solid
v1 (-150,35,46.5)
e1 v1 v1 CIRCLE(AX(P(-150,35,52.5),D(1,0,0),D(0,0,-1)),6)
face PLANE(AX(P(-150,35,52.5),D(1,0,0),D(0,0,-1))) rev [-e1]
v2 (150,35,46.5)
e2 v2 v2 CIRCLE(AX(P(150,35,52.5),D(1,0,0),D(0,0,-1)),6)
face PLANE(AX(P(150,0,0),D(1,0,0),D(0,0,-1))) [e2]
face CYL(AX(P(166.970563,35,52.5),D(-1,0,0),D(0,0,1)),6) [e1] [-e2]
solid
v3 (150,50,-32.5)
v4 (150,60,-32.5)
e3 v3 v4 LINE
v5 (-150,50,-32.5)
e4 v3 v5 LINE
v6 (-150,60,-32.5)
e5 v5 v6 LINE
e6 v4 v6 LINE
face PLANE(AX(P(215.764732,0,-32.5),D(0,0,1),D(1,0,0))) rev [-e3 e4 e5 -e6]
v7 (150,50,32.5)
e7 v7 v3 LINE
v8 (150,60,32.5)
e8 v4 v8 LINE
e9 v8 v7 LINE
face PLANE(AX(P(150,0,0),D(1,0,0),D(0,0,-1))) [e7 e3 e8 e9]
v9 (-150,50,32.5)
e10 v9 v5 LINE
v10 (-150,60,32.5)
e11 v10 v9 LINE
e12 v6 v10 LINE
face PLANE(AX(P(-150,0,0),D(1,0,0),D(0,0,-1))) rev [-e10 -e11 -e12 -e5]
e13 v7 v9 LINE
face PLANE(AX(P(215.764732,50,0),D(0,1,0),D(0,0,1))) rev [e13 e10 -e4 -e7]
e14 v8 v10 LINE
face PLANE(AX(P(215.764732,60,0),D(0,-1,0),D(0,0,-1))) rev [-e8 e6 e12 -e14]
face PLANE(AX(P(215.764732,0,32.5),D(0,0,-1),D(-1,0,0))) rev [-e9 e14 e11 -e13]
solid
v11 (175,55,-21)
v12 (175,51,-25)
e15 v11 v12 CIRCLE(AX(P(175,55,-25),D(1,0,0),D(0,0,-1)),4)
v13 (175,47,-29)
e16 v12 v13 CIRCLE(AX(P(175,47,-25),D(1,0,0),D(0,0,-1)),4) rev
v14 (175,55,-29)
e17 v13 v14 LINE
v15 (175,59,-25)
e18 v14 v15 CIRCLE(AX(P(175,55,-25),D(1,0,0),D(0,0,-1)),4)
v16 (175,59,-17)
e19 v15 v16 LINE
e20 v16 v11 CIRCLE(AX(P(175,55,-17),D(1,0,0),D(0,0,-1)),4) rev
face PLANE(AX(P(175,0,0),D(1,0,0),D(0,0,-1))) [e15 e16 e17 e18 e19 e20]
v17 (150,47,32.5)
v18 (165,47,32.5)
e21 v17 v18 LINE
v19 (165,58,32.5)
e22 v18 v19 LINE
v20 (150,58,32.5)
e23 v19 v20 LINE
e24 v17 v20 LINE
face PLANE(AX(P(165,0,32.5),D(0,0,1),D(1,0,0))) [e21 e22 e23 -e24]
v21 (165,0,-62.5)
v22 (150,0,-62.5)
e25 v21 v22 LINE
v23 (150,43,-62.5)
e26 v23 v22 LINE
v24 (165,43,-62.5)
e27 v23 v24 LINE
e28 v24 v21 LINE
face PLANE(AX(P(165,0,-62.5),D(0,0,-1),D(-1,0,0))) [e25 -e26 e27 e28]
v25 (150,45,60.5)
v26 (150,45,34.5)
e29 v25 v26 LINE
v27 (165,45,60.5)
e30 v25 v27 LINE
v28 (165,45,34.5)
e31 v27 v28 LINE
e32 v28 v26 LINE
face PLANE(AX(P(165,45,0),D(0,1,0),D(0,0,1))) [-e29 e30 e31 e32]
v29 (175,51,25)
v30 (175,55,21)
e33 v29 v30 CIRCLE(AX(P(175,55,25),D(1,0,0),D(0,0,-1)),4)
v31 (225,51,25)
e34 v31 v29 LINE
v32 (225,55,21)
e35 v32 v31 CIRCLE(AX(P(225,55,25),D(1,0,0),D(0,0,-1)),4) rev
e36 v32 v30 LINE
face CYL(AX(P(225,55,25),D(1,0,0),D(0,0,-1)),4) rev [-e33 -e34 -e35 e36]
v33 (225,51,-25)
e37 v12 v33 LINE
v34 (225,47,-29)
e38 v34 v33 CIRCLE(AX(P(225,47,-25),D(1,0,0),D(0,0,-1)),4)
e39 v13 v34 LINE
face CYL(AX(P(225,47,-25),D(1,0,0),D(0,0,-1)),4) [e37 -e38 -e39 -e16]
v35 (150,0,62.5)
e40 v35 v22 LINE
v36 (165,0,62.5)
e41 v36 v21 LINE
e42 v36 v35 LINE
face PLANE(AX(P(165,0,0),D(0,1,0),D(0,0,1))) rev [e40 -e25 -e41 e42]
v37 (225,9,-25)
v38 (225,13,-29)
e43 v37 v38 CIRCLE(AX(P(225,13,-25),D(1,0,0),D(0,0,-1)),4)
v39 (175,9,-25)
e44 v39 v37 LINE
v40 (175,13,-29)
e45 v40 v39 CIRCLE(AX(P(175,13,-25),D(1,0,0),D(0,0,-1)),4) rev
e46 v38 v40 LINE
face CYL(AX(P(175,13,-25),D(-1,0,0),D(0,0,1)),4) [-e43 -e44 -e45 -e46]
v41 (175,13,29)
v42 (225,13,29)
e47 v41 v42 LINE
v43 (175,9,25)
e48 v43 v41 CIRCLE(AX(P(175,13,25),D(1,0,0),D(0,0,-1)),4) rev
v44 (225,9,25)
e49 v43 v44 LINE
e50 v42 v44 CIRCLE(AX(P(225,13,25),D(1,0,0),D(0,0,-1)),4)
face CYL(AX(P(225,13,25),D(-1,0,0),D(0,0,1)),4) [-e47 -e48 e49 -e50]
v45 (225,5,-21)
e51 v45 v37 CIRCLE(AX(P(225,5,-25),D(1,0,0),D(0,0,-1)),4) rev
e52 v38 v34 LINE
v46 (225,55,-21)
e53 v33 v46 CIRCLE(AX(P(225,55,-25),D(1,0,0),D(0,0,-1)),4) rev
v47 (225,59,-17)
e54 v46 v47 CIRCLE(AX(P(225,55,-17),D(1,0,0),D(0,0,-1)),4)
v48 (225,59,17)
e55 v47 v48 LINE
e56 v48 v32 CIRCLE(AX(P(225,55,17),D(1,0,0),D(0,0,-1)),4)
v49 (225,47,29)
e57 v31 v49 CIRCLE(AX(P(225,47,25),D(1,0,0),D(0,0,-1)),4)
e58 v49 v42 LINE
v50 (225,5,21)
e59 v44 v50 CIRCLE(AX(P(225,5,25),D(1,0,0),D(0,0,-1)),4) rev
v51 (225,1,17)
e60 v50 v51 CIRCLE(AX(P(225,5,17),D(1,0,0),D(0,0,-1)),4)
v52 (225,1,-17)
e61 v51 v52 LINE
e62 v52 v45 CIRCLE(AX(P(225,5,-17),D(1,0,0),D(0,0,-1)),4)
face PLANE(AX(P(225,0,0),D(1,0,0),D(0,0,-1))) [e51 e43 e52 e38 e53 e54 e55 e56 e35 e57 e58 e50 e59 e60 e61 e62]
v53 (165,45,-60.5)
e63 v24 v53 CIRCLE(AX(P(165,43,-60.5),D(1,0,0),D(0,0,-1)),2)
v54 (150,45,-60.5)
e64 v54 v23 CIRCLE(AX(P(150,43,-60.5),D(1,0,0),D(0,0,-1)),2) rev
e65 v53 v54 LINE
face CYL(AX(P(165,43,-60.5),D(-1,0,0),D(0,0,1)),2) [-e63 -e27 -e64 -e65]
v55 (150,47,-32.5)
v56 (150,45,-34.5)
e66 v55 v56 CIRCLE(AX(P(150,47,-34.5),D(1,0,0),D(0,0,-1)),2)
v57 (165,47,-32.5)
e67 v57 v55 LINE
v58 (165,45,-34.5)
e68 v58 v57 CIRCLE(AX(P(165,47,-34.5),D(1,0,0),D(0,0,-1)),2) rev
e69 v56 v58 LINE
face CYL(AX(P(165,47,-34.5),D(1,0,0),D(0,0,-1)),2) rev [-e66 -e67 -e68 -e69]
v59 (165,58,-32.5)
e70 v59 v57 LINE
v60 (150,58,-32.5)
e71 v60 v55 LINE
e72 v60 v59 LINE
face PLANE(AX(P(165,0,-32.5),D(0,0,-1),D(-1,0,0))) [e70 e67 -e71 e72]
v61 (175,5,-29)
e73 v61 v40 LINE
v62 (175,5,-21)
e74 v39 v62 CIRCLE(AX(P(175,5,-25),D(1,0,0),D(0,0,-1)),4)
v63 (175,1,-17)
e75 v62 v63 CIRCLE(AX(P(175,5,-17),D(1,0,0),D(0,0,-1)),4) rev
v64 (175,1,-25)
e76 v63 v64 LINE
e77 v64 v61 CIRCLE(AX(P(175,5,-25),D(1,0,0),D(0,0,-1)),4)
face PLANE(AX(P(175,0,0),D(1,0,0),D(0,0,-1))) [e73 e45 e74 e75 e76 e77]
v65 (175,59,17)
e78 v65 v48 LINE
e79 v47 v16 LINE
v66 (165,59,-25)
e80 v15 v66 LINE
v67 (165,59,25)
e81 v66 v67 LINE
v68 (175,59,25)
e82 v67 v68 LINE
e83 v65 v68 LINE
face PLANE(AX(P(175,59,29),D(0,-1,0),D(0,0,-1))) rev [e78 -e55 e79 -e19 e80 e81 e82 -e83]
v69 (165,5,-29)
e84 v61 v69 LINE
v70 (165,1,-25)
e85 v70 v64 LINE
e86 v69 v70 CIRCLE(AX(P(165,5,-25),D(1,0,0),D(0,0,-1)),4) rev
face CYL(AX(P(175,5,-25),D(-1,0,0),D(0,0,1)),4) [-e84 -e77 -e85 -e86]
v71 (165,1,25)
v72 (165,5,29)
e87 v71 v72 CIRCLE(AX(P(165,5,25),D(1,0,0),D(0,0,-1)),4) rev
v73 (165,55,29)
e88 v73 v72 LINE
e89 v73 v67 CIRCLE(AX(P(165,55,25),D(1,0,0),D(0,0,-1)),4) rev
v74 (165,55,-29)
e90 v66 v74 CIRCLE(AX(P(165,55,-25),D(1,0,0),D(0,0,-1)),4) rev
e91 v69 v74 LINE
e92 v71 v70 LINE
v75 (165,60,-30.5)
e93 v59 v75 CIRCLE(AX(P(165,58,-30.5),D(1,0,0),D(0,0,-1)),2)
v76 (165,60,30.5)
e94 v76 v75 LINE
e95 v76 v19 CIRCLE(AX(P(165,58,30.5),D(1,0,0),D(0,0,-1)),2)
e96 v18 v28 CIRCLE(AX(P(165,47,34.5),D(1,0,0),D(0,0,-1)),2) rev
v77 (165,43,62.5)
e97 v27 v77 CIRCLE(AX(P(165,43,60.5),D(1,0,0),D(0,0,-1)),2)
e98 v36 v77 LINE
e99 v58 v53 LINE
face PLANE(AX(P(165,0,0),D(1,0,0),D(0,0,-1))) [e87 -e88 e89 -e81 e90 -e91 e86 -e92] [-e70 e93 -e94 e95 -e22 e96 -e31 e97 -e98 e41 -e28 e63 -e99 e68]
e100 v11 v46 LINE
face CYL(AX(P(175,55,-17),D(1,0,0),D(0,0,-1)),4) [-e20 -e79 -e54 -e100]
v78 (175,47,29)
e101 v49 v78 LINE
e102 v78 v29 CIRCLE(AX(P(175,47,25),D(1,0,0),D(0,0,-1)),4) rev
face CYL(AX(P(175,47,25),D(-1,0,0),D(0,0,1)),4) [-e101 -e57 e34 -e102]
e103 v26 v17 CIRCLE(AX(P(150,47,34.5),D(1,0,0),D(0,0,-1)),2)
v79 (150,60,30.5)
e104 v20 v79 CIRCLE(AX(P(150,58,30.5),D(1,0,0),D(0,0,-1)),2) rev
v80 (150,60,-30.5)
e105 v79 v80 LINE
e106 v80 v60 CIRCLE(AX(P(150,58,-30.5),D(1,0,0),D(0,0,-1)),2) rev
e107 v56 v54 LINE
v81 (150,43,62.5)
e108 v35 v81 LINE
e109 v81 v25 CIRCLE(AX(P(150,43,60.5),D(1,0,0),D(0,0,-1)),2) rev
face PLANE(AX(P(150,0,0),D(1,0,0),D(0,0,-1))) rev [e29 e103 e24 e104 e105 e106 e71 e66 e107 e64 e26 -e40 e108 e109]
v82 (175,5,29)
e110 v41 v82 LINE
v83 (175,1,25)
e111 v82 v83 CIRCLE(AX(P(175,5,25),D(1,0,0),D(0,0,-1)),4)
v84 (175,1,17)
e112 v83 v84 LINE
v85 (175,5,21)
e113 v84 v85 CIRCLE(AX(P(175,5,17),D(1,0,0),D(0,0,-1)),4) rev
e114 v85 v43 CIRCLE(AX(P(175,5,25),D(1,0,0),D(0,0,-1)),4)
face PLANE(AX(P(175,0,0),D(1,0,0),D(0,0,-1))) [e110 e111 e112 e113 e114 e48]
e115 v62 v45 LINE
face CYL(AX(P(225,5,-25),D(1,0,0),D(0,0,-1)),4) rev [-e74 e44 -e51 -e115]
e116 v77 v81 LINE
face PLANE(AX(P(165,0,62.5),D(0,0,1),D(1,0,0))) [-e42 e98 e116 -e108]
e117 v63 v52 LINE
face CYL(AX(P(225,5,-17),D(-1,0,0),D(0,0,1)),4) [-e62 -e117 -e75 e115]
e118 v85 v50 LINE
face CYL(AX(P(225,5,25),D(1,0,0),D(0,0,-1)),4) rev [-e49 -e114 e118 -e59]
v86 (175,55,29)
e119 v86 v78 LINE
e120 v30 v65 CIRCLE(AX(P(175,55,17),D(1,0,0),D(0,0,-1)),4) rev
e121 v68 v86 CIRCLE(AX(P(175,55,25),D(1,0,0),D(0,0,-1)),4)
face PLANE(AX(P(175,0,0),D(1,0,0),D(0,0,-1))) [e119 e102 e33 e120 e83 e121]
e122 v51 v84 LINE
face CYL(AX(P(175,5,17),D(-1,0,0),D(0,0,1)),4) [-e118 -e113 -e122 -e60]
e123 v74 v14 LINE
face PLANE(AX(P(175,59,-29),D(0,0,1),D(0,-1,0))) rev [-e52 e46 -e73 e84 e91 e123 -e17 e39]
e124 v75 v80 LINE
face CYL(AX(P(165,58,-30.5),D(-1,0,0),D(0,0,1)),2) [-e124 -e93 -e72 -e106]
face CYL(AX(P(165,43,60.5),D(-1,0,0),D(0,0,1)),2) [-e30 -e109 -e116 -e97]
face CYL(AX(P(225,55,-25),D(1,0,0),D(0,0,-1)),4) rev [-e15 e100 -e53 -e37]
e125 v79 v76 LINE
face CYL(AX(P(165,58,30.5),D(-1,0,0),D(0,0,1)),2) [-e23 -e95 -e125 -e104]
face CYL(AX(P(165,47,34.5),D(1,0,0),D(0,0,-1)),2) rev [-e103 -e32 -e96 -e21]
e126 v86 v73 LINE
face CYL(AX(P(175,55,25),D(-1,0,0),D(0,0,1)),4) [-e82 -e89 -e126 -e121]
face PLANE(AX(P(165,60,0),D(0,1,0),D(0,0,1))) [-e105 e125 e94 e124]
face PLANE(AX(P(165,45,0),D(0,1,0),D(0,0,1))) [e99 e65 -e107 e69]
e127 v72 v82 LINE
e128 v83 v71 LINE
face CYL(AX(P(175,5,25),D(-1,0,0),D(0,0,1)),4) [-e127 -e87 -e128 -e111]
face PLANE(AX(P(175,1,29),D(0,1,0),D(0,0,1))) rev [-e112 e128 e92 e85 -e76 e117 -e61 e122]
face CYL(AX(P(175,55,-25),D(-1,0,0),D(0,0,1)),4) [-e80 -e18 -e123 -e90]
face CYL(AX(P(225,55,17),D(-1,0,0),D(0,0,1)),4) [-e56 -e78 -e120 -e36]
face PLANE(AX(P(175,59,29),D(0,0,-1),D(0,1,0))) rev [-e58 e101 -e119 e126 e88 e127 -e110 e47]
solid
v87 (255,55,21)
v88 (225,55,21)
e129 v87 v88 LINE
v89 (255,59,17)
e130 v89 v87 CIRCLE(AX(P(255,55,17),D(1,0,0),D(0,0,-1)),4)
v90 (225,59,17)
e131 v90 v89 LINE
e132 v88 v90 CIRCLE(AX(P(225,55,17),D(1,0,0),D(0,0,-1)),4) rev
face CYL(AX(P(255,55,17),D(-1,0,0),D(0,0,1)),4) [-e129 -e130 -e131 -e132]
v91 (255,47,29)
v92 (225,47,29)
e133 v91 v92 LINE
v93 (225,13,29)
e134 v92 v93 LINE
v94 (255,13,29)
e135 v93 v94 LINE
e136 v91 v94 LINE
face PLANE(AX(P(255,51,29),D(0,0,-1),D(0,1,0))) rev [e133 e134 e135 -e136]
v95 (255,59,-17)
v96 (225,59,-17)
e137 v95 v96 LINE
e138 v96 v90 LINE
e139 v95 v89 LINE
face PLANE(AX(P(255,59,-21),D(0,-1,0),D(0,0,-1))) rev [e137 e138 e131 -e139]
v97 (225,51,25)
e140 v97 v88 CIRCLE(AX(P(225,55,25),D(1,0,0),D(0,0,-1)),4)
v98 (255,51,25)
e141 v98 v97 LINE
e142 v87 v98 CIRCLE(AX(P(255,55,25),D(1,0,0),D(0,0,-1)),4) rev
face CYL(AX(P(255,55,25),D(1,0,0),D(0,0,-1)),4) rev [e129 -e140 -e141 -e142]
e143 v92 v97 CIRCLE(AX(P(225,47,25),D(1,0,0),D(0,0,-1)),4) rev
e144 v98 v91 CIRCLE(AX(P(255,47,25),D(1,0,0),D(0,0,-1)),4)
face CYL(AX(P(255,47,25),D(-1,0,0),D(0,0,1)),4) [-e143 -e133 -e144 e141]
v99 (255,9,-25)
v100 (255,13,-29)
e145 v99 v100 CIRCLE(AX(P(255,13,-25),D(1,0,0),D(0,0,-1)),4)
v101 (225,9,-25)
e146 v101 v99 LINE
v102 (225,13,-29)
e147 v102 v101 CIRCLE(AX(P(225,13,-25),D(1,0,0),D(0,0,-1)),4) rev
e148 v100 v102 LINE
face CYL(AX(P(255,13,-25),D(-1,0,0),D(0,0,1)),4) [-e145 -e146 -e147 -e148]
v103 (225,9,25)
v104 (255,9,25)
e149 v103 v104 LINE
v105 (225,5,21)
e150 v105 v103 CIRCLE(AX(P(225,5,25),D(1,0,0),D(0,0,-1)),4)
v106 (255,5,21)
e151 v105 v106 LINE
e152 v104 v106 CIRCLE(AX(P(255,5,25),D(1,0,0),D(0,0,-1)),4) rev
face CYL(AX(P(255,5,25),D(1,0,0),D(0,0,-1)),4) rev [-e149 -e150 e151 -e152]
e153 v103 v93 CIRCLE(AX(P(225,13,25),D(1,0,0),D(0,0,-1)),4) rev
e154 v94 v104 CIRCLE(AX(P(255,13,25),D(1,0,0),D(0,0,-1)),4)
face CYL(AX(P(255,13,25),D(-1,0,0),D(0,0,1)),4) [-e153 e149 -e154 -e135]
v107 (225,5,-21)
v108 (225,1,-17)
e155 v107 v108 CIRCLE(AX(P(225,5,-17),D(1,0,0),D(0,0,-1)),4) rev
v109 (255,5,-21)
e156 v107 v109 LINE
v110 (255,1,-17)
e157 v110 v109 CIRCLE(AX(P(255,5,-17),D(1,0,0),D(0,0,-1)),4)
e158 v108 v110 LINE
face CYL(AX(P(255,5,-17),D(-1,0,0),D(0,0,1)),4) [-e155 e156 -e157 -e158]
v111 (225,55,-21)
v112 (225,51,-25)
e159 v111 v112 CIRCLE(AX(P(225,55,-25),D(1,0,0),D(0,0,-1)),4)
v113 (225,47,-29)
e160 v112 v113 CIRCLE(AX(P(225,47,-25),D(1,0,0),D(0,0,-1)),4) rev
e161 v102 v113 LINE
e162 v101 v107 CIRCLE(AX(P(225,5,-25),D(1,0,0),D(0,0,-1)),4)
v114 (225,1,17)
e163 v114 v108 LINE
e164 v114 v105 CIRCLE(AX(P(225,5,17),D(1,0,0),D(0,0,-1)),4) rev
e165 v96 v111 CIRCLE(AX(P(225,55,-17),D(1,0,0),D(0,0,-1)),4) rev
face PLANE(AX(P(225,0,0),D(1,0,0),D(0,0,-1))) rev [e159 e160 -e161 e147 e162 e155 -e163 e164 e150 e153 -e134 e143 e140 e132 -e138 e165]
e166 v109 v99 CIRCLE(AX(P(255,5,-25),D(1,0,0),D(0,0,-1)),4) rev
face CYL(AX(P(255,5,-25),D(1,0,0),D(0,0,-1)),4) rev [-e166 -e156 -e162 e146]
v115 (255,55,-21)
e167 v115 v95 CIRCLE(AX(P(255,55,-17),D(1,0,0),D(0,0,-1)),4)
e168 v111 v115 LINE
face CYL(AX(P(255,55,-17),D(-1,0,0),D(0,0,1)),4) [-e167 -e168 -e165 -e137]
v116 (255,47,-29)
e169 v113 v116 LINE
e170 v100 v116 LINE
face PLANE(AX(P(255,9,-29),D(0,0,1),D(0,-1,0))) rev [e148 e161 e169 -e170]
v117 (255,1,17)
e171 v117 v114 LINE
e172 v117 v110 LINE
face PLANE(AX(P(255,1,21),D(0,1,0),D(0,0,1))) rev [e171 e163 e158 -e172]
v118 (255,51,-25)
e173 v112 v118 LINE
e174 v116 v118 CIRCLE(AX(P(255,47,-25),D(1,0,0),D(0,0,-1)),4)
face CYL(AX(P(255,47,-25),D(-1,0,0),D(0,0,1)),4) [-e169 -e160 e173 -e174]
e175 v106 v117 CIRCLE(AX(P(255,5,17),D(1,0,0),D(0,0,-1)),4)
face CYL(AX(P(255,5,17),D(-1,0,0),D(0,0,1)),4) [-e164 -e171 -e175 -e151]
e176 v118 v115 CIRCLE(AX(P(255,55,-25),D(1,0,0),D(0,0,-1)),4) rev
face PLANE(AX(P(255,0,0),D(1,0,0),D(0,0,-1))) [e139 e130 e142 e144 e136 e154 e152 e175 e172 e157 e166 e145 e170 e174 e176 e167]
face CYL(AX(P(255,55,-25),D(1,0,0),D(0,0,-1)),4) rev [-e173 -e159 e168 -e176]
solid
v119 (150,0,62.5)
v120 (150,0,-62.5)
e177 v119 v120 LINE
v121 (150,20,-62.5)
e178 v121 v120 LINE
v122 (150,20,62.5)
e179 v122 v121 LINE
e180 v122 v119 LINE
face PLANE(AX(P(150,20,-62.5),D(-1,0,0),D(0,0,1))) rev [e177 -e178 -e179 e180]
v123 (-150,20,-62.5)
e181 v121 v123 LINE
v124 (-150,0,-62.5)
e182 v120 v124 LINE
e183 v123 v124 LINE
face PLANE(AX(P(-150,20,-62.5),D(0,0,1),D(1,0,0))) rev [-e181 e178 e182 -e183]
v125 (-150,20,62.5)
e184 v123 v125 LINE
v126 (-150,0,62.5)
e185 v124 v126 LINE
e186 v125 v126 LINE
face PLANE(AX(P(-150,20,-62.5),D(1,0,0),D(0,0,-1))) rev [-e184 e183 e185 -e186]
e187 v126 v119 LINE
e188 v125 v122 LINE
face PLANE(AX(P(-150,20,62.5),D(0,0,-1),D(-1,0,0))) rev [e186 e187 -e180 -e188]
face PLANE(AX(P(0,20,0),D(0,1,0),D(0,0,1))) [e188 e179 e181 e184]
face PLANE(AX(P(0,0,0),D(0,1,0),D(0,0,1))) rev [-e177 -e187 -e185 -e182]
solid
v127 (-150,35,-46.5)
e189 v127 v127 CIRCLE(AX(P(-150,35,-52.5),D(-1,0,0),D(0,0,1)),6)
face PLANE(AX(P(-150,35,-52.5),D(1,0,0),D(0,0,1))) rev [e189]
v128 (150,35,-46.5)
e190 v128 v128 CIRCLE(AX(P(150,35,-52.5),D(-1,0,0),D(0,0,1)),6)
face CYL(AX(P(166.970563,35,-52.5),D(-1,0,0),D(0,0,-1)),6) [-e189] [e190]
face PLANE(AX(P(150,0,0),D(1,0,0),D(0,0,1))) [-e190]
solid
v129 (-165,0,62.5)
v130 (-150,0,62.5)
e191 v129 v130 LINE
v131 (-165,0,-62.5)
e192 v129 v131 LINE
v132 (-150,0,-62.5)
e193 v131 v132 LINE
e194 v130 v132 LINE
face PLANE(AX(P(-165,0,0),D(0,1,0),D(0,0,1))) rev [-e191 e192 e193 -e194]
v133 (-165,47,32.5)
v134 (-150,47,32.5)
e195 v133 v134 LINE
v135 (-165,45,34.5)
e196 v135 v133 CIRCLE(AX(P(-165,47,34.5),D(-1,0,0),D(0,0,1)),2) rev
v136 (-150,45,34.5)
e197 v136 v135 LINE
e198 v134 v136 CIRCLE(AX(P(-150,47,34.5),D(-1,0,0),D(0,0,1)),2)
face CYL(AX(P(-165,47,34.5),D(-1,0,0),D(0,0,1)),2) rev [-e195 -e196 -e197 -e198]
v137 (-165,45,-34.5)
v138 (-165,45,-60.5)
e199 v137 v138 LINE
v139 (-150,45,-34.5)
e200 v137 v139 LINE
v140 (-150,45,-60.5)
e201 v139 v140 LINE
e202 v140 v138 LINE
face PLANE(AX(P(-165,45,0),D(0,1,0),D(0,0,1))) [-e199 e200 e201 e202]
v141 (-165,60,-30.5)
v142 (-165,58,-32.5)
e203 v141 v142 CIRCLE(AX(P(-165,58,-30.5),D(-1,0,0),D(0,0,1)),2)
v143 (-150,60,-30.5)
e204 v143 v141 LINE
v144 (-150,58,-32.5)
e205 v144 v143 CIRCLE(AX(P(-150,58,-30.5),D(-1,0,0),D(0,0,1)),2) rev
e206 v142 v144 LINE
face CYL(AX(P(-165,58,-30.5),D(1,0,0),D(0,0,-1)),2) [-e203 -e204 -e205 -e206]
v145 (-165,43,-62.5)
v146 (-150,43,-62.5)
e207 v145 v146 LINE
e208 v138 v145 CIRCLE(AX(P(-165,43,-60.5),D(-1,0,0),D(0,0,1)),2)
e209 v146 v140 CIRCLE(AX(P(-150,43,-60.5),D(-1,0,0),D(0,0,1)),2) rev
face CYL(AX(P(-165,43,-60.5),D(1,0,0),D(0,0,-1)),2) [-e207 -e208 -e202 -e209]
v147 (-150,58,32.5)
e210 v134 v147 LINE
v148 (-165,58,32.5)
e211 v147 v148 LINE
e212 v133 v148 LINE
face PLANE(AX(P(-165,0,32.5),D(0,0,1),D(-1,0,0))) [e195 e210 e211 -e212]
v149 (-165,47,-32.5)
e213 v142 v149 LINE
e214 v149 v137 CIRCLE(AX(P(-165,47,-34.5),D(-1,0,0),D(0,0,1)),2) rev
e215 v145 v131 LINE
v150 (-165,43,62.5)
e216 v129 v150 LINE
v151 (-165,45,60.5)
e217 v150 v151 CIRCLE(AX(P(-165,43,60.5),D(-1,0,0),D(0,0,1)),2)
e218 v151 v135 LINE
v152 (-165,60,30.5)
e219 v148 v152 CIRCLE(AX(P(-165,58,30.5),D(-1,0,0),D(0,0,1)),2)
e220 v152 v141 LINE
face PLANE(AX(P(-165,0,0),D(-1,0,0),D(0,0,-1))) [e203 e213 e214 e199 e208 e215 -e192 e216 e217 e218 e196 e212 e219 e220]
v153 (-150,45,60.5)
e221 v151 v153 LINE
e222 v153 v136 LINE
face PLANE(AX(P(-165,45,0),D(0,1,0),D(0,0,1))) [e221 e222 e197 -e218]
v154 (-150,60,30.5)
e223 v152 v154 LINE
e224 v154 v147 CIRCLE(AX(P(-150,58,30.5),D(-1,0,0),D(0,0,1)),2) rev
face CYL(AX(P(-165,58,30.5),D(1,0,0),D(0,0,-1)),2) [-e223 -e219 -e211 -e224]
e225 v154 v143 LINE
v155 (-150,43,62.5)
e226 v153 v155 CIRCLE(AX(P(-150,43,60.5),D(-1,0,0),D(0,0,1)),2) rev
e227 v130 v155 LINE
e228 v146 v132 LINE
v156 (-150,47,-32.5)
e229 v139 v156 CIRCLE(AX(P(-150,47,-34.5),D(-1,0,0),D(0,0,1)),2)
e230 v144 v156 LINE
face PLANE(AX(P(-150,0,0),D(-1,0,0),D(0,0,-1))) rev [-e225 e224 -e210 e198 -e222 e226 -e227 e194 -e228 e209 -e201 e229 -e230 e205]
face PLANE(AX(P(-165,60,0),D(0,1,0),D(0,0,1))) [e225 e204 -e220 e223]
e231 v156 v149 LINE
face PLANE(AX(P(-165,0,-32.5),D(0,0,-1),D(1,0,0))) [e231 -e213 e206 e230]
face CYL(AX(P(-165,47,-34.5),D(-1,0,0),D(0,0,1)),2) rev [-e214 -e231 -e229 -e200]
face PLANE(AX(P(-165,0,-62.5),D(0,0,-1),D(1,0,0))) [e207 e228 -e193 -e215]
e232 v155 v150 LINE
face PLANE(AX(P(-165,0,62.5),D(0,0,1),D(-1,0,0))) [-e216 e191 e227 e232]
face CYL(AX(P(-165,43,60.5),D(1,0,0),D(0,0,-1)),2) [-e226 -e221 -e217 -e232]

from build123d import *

# Parameters (mm, degrees)
SKETCH1_W           = 300
SKETCH1_H           = 125
BOSS_EXTRUDE1_DEPTH = 20
SKETCH2_W           = 125
SKETCH2_H           = 20
BOSS_EXTRUDE2_DEPTH = 15
SKETCH3_R           = 6
BOSS_EXTRUDE3_DEPTH = 300
SKETCH4_W           = 58
SKETCH4_H           = 58
BOSS_EXTRUDE4_DEPTH = 10
BOSS_EXTRUDE5_DEPTH = 50
BOSS_EXTRUDE6_DEPTH = 30
SKETCH7_W           = 65
SKETCH7_H           = 10
BOSS_EXTRUDE7_DEPTH = 300
FILLET1_R           = 2
FILLET2_R           = 2
FILLET3_R           = 4
FILLET4_R           = 4


with BuildPart() as part:
    # Sketch1 → Boss-Extrude1 (new body)
    with BuildSketch(Plane(origin=(0, 0, 0), x_dir=(1, 0, 0), z_dir=(0, 1, 0))):
        Rectangle(SKETCH1_W, SKETCH1_H)
    extrude(amount=BOSS_EXTRUDE1_DEPTH)


with BuildPart() as body_2:
    # Sketch2 → Boss-Extrude2 (new body)
    with BuildSketch(Plane(origin=(150, 0, 0), x_dir=(0, 0, -1), z_dir=(1, 0, 0))):
        Polygon((62.5, 45), (62.5, 20), (-62.5, 20), (-62.5, 45), (-32.5, 45), (-32.5, 60), (32.5, 60), (32.5, 45), align=None)
        with Locations((0, 10)):
            Rectangle(SKETCH2_W, SKETCH2_H)
    extrude(amount=BOSS_EXTRUDE2_DEPTH)


with BuildPart() as body_3:
    # Mirror1: mirrored copy
    add(body_2.part.mirror(Plane(origin=(0, 0, 0), x_dir=(0, 0, 1), z_dir=(1, 0, 0))))

    # Fillet1
    fillet1_edges = [body_3.edges().sort_by_distance(p)[0] for p in [
        (-157.5, 45, 62.5),
        (-157.5, 45, 32.5),
        (-157.5, 60, 32.5),
        (-157.5, 60, -32.5),
        (-157.5, 45, -32.5),
        (-157.5, 45, -62.5),
    ]]
    fillet(fillet1_edges, radius=FILLET1_R)


with BuildPart() as body_4:
    # Sketch3 → Boss-Extrude3 (new body)
    with BuildSketch(Plane(origin=(-150, 0, 0), x_dir=(0, 0, -1), z_dir=(1, 0, 0))):
        with Locations((-52.5, 35)):
            Circle(SKETCH3_R)
    extrude(amount=BOSS_EXTRUDE3_DEPTH)


with BuildPart() as body_5:
    # Mirror2: mirrored copy
    add(body_4.part.mirror(Plane.XY))


with BuildPart() as body_2_1:
    add(body_2.part)

    # Sketch4 → Boss-Extrude4 (add)
    with BuildSketch(Plane(origin=(165, 0, 0), x_dir=(0, 0, -1), z_dir=(1, 0, 0))):
        with Locations((0, 30)):
            Rectangle(SKETCH4_W, SKETCH4_H)
    extrude(amount=BOSS_EXTRUDE4_DEPTH)

    # Sketch5 → Boss-Extrude5 (add)
    with BuildSketch(Plane(origin=(175, 0, 0), x_dir=(0, 0, -1), z_dir=(1, 0, 0))):
        Polygon((21, 59), (-21, 59), (-21, 51), (-29, 51), (-29, 9), (-21, 9), (-21, 1), (21, 1), (21, 9), (29, 9), (29, 51), (21, 51), align=None)
    extrude(amount=BOSS_EXTRUDE5_DEPTH)

    # Fillet2
    fillet2_edges = [body_2_1.edges().sort_by_distance(p)[0] for p in [
        (157.5, 45, 62.5),
        (157.5, 45, 32.5),
        (157.5, 60, 32.5),
        (157.5, 60, -32.5),
        (157.5, 45, -32.5),
        (157.5, 45, -62.5),
    ]]
    fillet(fillet2_edges, radius=FILLET2_R)

    # Fillet3
    fillet3_edges = [body_2_1.edges().sort_by_distance(p)[0] for p in [
        (170, 1, 29),
        (170, 1, -29),
        (170, 59, 29),
        (170, 59, -29),
        (200, 51, -21),
        (200, 9, -21),
        (200, 9, 21),
        (200, 51, 21),
        (200, 9, 29),
        (200, 1, 21),
        (200, 1, -21),
        (200, 9, -29),
        (200, 51, -29),
        (200, 59, -21),
        (200, 51, 29),
        (200, 59, 21),
    ]]
    fillet(fillet3_edges, radius=FILLET3_R - 0.0001)  # a hair under: the kernel refuses the full size


with BuildPart() as body_6:
    # Sketch6 → Boss-Extrude6 (new body)
    with BuildSketch(Plane(origin=(225, 0, 0), x_dir=(0, 0, -1), z_dir=(1, 0, 0))):
        Polygon((-29, 9), (-21, 9), (-21, 1), (21, 1), (21, 9), (29, 9), (29, 51), (21, 51), (21, 59), (-21, 59), (-21, 51), (-29, 51), align=None)
    extrude(amount=BOSS_EXTRUDE6_DEPTH)

    # Fillet4
    fillet4_edges = [body_6.edges().sort_by_distance(p)[0] for p in [
        (240, 1, -21),
        (240, 51, 29),
        (240, 9, 29),
        (240, 1, 21),
        (240, 9, -29),
        (240, 51, -29),
        (240, 59, -21),
        (240, 59, 21),
        (240, 9, -21),
        (240, 9, 21),
        (240, 51, -21),
        (240, 51, 21),
    ]]
    fillet(fillet4_edges, radius=FILLET4_R - 0.0001)  # a hair under: the kernel refuses the full size


with BuildPart() as body_7:
    # Sketch7 → Boss-Extrude7 (new body)
    with BuildSketch(Plane(origin=(-150, 0, 0), x_dir=(0, 0, -1), z_dir=(1, 0, 0))):
        with Locations((0, 55)):
            Rectangle(SKETCH7_W, SKETCH7_H)
    extrude(amount=BOSS_EXTRUDE7_DEPTH)


solid = Compound([part.part, body_3.part, body_4.part, body_5.part, body_2_1.part, body_6.part, body_7.part])
